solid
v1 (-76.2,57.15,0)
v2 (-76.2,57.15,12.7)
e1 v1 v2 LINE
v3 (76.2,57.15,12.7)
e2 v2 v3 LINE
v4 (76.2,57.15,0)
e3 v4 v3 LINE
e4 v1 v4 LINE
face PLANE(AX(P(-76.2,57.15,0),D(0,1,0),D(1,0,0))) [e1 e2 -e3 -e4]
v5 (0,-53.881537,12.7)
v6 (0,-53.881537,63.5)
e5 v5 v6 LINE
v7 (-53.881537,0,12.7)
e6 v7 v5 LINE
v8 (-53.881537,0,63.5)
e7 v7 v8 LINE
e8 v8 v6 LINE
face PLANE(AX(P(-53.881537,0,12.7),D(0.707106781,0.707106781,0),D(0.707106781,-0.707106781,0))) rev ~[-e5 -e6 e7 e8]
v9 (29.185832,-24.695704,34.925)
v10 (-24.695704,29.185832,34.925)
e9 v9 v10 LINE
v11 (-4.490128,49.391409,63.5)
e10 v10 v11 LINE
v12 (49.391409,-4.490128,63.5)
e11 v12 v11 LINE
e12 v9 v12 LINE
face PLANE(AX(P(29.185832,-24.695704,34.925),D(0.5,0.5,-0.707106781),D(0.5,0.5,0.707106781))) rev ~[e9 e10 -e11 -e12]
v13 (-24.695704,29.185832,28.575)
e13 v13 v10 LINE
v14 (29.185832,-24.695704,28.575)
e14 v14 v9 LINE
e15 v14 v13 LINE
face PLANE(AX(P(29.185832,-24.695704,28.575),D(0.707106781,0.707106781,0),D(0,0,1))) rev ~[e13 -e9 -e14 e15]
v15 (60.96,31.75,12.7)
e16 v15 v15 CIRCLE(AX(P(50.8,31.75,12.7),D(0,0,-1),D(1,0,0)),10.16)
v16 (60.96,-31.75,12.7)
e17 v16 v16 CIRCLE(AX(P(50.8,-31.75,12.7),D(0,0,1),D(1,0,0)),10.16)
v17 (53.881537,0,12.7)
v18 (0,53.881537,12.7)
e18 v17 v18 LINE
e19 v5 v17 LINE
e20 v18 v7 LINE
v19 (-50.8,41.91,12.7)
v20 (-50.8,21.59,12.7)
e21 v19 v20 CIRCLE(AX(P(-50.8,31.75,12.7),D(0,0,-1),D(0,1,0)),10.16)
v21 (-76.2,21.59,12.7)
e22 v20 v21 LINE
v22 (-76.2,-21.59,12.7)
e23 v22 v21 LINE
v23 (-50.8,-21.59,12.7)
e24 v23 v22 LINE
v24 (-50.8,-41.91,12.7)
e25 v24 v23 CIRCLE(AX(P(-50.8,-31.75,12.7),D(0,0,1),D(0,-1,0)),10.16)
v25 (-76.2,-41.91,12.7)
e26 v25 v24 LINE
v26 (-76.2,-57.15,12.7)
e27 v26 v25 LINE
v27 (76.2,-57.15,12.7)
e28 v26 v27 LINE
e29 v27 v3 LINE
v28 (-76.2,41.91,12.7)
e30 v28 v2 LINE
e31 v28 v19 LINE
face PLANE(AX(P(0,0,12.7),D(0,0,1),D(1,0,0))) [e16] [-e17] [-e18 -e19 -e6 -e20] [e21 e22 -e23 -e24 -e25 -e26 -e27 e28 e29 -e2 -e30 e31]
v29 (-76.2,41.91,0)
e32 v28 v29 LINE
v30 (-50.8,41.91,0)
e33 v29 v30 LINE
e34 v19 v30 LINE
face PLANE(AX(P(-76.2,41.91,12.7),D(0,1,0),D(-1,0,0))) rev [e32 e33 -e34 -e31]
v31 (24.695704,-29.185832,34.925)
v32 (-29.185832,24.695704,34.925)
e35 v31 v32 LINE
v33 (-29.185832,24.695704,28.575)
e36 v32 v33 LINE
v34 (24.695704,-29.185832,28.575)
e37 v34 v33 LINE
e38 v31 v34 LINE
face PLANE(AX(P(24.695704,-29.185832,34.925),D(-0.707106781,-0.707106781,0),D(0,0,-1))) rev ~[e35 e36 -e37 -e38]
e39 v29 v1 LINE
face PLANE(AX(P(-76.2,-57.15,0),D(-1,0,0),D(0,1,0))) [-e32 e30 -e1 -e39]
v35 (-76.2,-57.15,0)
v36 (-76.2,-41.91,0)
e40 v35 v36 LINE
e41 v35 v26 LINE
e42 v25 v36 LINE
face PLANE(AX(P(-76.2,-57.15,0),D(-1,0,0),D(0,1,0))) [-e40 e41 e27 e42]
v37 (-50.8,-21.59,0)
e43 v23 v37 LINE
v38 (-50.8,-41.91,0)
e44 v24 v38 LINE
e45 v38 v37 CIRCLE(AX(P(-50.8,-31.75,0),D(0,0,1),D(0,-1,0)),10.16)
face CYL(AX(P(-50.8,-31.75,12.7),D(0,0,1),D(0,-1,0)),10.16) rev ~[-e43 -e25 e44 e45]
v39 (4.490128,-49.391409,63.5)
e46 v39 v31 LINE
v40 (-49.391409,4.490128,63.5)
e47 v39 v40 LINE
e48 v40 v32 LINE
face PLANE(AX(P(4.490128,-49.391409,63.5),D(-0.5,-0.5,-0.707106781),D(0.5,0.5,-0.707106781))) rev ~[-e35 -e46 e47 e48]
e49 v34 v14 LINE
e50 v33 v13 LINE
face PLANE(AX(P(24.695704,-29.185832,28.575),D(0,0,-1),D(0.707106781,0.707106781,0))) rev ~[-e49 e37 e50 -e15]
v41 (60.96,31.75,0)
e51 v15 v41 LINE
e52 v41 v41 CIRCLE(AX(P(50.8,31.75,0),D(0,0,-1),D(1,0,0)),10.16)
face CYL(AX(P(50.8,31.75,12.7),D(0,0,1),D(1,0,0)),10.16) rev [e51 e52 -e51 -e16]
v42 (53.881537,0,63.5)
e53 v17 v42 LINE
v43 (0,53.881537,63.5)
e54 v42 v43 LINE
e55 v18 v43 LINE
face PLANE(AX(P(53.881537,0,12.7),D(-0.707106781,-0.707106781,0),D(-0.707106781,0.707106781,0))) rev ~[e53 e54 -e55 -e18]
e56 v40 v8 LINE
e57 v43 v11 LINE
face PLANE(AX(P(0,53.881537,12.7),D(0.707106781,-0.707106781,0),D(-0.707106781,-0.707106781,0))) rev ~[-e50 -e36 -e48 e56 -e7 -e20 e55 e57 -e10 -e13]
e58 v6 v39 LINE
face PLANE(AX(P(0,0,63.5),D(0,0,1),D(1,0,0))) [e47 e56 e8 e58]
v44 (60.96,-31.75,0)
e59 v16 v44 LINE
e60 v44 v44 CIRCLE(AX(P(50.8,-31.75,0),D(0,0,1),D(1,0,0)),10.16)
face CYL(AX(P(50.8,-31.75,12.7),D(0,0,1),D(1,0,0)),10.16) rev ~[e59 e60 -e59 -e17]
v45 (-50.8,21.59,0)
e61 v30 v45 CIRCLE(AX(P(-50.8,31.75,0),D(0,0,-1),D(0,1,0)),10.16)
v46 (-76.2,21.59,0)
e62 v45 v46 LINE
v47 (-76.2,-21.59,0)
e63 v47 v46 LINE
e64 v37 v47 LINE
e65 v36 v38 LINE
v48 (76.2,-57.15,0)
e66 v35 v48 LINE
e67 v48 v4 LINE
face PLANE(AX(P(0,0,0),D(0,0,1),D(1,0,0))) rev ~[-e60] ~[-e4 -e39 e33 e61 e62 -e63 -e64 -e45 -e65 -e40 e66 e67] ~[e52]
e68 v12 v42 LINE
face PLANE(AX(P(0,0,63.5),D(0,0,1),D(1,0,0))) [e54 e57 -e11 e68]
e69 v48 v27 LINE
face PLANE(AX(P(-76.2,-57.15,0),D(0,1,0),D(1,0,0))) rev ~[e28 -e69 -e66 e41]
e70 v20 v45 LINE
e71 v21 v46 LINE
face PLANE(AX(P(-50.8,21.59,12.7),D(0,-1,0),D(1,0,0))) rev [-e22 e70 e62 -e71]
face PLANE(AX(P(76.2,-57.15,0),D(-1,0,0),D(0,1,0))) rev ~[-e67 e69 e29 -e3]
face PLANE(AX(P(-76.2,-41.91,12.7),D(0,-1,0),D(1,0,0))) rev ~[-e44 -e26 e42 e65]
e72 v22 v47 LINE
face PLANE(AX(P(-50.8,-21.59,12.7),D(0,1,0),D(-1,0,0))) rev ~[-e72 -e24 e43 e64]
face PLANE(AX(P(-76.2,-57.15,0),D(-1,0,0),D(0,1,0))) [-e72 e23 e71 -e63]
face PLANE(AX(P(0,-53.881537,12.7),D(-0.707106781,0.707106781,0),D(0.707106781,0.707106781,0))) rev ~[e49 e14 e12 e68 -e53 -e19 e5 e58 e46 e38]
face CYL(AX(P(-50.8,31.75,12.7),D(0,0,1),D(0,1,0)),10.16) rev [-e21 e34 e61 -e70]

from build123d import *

# Parameters (mm, degrees)
F0_W     = 152.4
F0_H     = 114.3
F1_DEPTH = 12.7
F3_DEPTH = 12.7
F4_R     = 10.16
F5_DEPTH = 12.7
F7_DEPTH = 50.8
F9_DEPTH = 76.2


# Not quite as in the source:
# - a pattern or mirror of a feature is missing from the dataset's text; its kind, count and spacing are read off the source's solid


with BuildPart() as f1:
    # F0 (on Top) → F1 (new body)
    with BuildSketch(Plane.XY):
        Rectangle(F0_W, F0_H)
    extrude(amount=F1_DEPTH)

    # F2 (on face) → F3 (cut, through all)
    with BuildSketch(Plane.XY.offset(12.7)):
        with BuildLine():
            Line((-50.8, -21.59), (-76.2, -21.59))
            Line((-76.2, -21.59), (-76.2, -41.91))
            Line((-76.2, -41.91), (-50.8, -41.91))
            ThreePointArc((-50.8, -41.91), (-40.64, -31.75), (-50.8, -21.59))
        make_face()
    f3 = extrude(amount=-F3_DEPTH, mode=Mode.SUBTRACT)

    # F3_copies: F3 across plane
    add(f3.mirror(Plane.ZX), mode=Mode.SUBTRACT)

    # F4 (on face) → F5 (cut, through all)
    with BuildSketch(Plane.XY.offset(12.7)):
        with Locations((50.8, -31.75)):
            Circle(F4_R)
    f5 = extrude(amount=-F5_DEPTH, mode=Mode.SUBTRACT)

    # F5_copies: F5 across plane
    add(f5.mirror(Plane.ZX), mode=Mode.SUBTRACT)

    # F6 (on face) → F7 (join)
    with BuildSketch(Plane.XY.offset(12.7)):
        Polygon((53.8815367264, 0), (0, 53.8815367264), (-53.8815367264, 0), (0, -53.8815367264), align=None)
    extrude(amount=F7_DEPTH)

    # F8 (on face) → F9 (cut, through all)
    with BuildSketch(Plane(origin=(26.9407683632, -26.9407683632, 0), x_dir=(0.7071067812, 0.7071067812, 0), z_dir=(0.7071067812, -0.7071067812, 0))):
        Polygon((31.75, 63.5), (-31.75, 63.5), (-3.175, 34.925), (-3.175, 28.575), (3.175, 28.575), (3.175, 34.925), align=None)
    extrude(amount=-F9_DEPTH, mode=Mode.SUBTRACT)


solid = f1.part
